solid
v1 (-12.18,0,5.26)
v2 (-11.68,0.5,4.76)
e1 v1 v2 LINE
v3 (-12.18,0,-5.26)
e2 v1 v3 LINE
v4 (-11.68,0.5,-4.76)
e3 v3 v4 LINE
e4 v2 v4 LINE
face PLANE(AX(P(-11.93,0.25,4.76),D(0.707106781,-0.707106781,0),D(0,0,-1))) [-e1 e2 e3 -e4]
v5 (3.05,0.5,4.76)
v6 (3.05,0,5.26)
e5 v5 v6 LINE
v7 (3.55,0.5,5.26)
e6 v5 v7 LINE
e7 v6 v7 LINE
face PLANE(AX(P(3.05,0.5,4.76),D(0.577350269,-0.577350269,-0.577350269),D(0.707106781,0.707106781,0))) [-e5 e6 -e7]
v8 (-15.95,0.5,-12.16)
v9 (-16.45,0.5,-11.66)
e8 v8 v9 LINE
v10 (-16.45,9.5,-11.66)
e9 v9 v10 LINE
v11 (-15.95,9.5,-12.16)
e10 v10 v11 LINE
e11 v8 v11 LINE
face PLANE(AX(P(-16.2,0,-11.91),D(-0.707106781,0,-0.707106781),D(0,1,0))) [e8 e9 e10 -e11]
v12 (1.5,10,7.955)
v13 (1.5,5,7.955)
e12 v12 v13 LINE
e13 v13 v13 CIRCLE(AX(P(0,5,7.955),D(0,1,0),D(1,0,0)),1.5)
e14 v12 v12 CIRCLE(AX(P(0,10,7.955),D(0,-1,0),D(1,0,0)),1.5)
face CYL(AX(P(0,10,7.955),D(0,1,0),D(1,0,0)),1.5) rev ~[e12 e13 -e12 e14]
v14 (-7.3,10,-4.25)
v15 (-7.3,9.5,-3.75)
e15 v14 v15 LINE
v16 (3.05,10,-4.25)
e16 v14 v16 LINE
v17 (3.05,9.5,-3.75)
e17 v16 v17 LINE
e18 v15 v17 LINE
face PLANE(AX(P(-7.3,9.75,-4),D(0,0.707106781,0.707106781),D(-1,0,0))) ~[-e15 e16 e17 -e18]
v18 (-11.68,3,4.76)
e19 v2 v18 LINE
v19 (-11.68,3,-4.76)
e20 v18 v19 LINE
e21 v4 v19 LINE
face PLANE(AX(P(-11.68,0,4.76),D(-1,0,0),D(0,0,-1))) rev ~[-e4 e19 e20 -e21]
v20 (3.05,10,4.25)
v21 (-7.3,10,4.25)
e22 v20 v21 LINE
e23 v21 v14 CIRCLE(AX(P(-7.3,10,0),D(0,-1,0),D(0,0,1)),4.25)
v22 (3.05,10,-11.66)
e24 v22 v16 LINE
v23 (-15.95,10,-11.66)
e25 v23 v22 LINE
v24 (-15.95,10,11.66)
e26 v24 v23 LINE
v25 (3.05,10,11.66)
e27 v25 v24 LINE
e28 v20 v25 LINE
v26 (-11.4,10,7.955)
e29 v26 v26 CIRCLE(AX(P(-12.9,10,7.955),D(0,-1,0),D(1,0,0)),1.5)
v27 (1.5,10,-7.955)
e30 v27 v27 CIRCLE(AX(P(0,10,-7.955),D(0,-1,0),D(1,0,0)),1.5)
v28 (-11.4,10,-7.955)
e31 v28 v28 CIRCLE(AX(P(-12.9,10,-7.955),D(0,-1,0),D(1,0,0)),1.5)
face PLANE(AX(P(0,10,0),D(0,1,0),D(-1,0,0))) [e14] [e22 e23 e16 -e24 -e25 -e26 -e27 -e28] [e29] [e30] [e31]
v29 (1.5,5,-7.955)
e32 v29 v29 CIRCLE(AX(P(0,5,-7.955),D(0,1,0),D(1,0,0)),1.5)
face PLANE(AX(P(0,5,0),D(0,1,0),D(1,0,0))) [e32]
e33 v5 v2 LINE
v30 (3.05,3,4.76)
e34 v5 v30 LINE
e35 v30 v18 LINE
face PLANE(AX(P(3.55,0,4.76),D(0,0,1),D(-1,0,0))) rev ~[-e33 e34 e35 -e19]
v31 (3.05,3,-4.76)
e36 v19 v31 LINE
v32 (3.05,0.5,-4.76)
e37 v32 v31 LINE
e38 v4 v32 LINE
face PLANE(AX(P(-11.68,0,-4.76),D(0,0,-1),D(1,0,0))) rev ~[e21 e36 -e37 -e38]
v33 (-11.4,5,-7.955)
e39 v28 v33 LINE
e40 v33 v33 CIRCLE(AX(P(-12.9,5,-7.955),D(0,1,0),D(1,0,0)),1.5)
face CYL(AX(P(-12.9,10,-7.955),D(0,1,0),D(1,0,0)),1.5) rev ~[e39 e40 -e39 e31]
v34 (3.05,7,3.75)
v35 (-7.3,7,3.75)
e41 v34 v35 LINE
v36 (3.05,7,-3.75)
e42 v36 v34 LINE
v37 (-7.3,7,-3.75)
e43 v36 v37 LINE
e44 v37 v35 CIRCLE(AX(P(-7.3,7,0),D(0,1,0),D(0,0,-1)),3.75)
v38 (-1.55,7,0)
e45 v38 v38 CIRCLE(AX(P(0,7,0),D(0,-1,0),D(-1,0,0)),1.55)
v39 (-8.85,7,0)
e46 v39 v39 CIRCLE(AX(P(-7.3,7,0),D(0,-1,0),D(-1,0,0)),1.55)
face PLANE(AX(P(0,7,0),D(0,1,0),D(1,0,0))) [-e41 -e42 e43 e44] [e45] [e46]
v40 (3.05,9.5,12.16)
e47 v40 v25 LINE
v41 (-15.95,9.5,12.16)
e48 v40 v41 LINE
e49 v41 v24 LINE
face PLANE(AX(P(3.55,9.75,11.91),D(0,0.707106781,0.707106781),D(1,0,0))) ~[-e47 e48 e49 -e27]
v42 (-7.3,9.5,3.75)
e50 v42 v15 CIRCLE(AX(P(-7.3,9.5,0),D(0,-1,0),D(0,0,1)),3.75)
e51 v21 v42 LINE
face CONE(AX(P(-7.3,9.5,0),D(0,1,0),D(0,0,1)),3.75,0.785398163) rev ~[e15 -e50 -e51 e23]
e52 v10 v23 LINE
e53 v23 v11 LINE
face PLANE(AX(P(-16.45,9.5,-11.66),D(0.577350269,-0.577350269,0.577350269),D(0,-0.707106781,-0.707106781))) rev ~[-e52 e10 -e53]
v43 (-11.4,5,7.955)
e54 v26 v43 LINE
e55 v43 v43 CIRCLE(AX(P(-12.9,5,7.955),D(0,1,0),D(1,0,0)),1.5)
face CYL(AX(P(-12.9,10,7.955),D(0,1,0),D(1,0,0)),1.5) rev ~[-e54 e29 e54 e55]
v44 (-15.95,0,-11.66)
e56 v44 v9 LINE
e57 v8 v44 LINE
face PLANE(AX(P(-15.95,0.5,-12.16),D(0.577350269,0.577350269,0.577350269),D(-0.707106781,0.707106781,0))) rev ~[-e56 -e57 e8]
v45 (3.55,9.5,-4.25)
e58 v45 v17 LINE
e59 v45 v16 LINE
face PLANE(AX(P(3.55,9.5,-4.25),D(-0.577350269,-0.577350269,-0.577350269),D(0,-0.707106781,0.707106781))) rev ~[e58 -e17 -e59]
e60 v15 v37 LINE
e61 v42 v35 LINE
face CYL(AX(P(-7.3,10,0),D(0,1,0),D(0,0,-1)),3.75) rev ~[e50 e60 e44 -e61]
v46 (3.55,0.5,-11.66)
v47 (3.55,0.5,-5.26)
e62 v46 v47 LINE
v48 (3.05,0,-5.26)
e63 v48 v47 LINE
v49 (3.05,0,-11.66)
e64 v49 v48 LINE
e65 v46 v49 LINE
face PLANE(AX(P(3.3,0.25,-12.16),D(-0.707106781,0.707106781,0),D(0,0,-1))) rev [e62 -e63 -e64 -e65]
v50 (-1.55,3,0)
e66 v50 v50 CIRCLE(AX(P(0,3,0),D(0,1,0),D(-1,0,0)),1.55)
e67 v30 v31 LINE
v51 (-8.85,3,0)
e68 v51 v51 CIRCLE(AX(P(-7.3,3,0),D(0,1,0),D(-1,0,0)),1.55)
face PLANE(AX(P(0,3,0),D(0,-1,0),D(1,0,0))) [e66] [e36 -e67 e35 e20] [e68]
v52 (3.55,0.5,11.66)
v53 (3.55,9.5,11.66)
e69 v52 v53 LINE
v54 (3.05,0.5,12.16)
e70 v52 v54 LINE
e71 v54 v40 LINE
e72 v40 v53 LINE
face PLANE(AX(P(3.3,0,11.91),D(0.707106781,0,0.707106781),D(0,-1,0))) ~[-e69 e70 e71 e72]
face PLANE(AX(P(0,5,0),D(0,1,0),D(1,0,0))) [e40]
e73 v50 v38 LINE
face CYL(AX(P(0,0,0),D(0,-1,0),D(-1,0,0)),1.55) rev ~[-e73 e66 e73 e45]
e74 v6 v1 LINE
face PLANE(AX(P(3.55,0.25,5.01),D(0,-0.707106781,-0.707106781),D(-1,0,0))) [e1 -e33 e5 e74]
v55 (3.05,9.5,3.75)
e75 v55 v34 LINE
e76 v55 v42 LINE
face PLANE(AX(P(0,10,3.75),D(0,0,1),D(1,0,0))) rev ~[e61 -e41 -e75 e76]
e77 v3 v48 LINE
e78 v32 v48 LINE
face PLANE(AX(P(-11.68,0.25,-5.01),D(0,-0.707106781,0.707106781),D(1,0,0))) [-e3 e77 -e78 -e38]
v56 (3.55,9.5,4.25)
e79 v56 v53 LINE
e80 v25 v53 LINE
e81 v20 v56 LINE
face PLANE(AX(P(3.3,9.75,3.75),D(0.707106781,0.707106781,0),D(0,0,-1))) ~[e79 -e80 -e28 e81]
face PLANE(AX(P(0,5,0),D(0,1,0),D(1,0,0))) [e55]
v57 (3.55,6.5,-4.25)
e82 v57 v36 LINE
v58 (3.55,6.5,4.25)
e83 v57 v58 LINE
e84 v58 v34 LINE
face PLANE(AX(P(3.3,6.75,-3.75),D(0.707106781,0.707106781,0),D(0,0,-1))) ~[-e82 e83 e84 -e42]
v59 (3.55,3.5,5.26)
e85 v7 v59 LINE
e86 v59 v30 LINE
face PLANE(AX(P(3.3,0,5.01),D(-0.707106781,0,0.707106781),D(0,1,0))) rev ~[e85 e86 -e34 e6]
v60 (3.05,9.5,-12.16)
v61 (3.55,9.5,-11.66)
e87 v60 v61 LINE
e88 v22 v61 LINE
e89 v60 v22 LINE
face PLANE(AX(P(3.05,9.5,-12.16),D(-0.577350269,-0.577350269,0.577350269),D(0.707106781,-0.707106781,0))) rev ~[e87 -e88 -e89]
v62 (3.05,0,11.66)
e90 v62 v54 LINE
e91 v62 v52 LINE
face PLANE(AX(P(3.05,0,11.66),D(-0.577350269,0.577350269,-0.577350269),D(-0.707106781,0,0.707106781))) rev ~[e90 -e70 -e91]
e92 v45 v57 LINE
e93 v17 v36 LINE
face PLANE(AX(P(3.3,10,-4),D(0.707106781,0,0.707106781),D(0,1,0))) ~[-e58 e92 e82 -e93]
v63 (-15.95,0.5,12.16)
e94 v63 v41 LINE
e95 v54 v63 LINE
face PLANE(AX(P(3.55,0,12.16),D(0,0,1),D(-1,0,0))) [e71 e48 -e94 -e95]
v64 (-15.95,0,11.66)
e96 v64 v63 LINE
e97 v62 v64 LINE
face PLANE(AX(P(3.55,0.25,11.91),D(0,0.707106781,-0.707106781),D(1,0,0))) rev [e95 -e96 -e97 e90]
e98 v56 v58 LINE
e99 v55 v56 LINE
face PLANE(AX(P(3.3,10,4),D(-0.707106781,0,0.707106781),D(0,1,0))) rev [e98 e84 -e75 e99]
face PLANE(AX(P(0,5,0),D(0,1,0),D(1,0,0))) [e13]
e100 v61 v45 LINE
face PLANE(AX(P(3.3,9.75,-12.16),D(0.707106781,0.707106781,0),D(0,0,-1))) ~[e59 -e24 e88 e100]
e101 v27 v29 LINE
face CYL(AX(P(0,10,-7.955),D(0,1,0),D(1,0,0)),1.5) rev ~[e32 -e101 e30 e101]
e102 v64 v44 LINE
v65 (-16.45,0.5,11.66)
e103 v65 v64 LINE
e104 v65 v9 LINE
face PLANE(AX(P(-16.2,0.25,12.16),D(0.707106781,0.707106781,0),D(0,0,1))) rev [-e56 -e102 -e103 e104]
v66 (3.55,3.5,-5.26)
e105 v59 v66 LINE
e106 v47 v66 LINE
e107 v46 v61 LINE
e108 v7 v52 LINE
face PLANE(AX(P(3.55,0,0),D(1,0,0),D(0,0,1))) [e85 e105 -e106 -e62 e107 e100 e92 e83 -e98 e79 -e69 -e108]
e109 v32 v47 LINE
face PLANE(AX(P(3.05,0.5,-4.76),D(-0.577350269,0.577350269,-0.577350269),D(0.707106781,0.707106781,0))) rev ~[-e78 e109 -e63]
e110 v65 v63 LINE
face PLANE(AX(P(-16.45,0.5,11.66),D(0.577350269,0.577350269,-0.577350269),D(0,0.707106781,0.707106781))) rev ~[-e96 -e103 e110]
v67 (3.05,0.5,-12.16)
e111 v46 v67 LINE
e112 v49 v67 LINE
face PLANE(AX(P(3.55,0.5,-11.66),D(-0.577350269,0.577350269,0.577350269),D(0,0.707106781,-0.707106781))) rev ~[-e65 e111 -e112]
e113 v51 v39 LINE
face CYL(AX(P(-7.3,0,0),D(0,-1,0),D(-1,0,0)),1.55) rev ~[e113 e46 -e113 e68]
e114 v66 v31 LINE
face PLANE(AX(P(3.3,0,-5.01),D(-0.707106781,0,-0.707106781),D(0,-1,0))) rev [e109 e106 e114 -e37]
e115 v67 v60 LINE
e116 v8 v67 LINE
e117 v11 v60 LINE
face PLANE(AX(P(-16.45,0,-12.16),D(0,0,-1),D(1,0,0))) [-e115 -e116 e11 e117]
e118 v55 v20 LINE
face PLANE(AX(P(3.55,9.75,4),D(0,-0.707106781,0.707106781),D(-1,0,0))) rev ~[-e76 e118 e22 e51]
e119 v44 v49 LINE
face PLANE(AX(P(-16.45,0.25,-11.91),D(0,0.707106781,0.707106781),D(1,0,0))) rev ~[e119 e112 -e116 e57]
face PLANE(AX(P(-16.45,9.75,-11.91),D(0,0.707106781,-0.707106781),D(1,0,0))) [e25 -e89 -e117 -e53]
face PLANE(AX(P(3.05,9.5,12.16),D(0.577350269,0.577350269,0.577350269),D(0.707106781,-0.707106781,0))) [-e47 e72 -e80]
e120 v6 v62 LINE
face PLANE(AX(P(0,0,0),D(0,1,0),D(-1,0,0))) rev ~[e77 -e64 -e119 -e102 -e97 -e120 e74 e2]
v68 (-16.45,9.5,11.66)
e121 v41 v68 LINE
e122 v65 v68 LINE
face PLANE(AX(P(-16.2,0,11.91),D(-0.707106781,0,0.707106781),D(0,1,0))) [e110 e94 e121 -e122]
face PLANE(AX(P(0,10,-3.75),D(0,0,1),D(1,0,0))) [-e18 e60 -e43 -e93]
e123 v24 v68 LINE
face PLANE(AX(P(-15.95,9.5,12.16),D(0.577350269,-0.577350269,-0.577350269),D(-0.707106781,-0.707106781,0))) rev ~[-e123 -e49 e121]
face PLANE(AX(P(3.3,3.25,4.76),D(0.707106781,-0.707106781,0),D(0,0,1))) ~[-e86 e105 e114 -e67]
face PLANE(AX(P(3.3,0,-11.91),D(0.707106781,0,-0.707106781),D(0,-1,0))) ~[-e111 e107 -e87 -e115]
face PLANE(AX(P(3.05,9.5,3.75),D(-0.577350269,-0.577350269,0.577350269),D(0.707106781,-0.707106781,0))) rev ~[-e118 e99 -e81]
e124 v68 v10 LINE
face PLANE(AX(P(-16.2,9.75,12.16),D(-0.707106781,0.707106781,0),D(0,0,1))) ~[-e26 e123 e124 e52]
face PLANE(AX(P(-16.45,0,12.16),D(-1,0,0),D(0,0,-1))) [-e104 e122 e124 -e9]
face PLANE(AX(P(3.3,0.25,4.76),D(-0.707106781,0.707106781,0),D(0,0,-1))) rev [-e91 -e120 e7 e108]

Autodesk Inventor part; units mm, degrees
ref_plane "YZ Plane" through (0, 0, 0) normal (1, 0, 0) x (0, 1, 0)
ref_plane "XZ Plane" through (0, 0, 0) normal (0, 1, 0) x (-1, 0, 0)
ref_plane "XY Plane" through (0, 0, 0) normal (0, 0, 1) x (1, 0, 0)
sketch "Sketch1" plane through (0, 0, 0) normal (0, 1, 0) x (-1, 0, 0)
  circle A0 centre (7.3, 0) radius 1.55
  circle A1 centre (0, 0) radius 1.55
  line L0 (0, 10.8163) -> (0, -10.8163)
  line L1 (6.335, 0) -> (-6.335, 0)
  line L2 (-3.55, 12.16) -> (16.45, 12.16)
  line L3 (16.45, 12.16) -> (16.45, -12.16)
  line L4 (16.45, -12.16) -> (-3.55, -12.16)
  line L5 (-3.55, -12.16) -> (-3.55, 12.16)
  dimension "d0" = 3.1
  dimension "d1" = 7.3
  dimension "d2" = 2
  dimension "d3" = 24.32
  dimension "d4" = 20
extrude "Extrusion1" add sketch "Sketch1" along normal blind 10
sketch "Sketch2" plane through (0, 0, 0) normal (0, -1, 0) x (1, 0, 0)
  line L0 (3.55, 4.76) -> (-11.68, 4.76)
  line L1 (-11.68, 4.76) -> (-11.68, -4.76)
  line L2 (-11.68, -4.76) -> (3.55, -4.76)
  line L3 (3.55, -4.76) -> (3.55, 4.76)
  circle A0 centre (0, 0) radius 1.55 projected
  circle A1 centre (-7.3, 0) radius 1.55 projected
  line L4 (0, 0) -> (-7.3, 0)
  line L5 (3.55, 12.16) -> (3.55, -12.16) projected
  dimension "d7" = 9.52
  dimension "d8" = 4.38
extrude "Extrusion2" cut sketch "Sketch2" against normal blind 3
sketch "Sketch3" plane through (0, 10, 0) normal (0, 1, 0) x (1, 0, 0)
  circle A0 centre (-7.3, 0) radius 1.55 projected
  circle A1 centre (0, 0) radius 1.55 projected
  arc A2 (3.55, -1.2083) -> (3.55, 1.2083) centre (0, 0) ccw
  arc A3 (-7.3, 3.75) -> (-7.3, -3.75) centre (-7.3, 0) ccw
  line L0 (3.55, -12.16) -> (3.55, 12.16) projected
  line L1 (-7.3, 3.75) -> (0, 3.75)
  line L2 (-7.3, -3.75) -> (0, -3.75)
  line L3 (3.55, -1.2083) -> (3.55, 1.2083)
  line L4 (3.55, -1.2083) -> (3.55, 1.2083)
  line L5 (0, -3.75) -> (3.55, -3.75)
  line L6 (0, 3.75) -> (3.55, 3.75)
  dimension "d11" = 7.5
extrude "Extrusion3" cut sketch "Sketch3" against normal blind 3 contours L0 L5 L2 A3 L1 L6
sketch "Sketch4" plane through (0, 10, 0) normal (0, 1, 0) x (1, 0, 0)
  line L0 (3.55, -12.16) -> (3.55, -3.75) projected
  line L1 (3.55, -3.75) -> (-7.3, -3.75) projected
  arc A0 (-7.3, 3.75) -> (-7.3, -3.75) centre (-7.3, 0) ccw projected
  line L2 (-7.3, 3.75) -> (3.55, 3.75) projected
  line L3 (3.55, 3.75) -> (3.55, -3.75) projected
  circle A1 centre (0, -7.955) radius 1.5
  circle A2 centre (-12.9, -7.955) radius 1.5
  line L4 (-16.45, 12.16) -> (-16.45, -12.16) projected
  line L5 (-16.45, 0) -> (3.55, 0)
  circle A3 centre (0, 7.955) radius 1.5
  circle A4 centre (-12.9, 7.955) radius 1.5
  line L6 (3.55, -7.955) -> (-16.45, -7.955)
  line L7 (3.55, 4.76) -> (3.55, 12.16) projected
  line L8 (3.55, 7.955) -> (-16.45, 7.955)
  line L9 (-11.05, 0) -> (-16.45, 0) construction
  point P0 (0, 0)
  dimension "d15" = 3
  dimension "d16" = 3
  dimension "d18" = 3.55
  dimension "d19" = 3.55
extrude "Extrusion4" cut sketch "Sketch4" against normal blind 5 contours L6 A1 | A1 L6 | L6 A2 | A2 L6 | L8 A3 | A3 L8 | L8 A4 | A4 L8
chamfer "Chamfer1" distance 0.5 angle 45 26 edges at (3.55, 10, 7.955) (-1.875, 10, 3.75) (-11.05, 10, 0) (-1.875, 10, -3.75) (3.55, 10, -7.955) (-6.45, 10, -12.16) (-16.45, 10, 0) (-6.45, 10, 12.16) (3.55, 5, 12.16) (3.55, 0, 8.46) (-6.45, 0, 12.16) (-16.45, 0, 0) (-6.45, 0, -12.16) (3.55, 0, -8.46) (3.55, 5, -12.16) (-16.45, 5, -12.16) (-16.45, 5, 12.16) (-11.68, 0, 0) (-4.065, 0, 4.76) (-4.065, 0, -4.76) (3.55, 1.5, 4.76) (3.55, 1.5, -4.76) (3.55, 3, 0) (3.55, 7, 0) (3.55, 8.5, 3.75) (3.55, 8.5, -3.75)
ref_plane "Work Plane1" through (-15.95, 0.5, 0) normal (0, 0, 1) x (1, 0, 0)
equation "\"d0\" = spacer_hole_diameter"
equation "\"d1\" = load_cell_hole_discance"
equation "\"load_cell_hole_discance\" = 7.3"
equation "\"spacer_hole_diameter\" = 3.1"
equation "\"load_cell_width\" = 9.32"
equation "\"load_cell_hole_edge\" = 4.18"
properties part number "load_cell_connector_top"
